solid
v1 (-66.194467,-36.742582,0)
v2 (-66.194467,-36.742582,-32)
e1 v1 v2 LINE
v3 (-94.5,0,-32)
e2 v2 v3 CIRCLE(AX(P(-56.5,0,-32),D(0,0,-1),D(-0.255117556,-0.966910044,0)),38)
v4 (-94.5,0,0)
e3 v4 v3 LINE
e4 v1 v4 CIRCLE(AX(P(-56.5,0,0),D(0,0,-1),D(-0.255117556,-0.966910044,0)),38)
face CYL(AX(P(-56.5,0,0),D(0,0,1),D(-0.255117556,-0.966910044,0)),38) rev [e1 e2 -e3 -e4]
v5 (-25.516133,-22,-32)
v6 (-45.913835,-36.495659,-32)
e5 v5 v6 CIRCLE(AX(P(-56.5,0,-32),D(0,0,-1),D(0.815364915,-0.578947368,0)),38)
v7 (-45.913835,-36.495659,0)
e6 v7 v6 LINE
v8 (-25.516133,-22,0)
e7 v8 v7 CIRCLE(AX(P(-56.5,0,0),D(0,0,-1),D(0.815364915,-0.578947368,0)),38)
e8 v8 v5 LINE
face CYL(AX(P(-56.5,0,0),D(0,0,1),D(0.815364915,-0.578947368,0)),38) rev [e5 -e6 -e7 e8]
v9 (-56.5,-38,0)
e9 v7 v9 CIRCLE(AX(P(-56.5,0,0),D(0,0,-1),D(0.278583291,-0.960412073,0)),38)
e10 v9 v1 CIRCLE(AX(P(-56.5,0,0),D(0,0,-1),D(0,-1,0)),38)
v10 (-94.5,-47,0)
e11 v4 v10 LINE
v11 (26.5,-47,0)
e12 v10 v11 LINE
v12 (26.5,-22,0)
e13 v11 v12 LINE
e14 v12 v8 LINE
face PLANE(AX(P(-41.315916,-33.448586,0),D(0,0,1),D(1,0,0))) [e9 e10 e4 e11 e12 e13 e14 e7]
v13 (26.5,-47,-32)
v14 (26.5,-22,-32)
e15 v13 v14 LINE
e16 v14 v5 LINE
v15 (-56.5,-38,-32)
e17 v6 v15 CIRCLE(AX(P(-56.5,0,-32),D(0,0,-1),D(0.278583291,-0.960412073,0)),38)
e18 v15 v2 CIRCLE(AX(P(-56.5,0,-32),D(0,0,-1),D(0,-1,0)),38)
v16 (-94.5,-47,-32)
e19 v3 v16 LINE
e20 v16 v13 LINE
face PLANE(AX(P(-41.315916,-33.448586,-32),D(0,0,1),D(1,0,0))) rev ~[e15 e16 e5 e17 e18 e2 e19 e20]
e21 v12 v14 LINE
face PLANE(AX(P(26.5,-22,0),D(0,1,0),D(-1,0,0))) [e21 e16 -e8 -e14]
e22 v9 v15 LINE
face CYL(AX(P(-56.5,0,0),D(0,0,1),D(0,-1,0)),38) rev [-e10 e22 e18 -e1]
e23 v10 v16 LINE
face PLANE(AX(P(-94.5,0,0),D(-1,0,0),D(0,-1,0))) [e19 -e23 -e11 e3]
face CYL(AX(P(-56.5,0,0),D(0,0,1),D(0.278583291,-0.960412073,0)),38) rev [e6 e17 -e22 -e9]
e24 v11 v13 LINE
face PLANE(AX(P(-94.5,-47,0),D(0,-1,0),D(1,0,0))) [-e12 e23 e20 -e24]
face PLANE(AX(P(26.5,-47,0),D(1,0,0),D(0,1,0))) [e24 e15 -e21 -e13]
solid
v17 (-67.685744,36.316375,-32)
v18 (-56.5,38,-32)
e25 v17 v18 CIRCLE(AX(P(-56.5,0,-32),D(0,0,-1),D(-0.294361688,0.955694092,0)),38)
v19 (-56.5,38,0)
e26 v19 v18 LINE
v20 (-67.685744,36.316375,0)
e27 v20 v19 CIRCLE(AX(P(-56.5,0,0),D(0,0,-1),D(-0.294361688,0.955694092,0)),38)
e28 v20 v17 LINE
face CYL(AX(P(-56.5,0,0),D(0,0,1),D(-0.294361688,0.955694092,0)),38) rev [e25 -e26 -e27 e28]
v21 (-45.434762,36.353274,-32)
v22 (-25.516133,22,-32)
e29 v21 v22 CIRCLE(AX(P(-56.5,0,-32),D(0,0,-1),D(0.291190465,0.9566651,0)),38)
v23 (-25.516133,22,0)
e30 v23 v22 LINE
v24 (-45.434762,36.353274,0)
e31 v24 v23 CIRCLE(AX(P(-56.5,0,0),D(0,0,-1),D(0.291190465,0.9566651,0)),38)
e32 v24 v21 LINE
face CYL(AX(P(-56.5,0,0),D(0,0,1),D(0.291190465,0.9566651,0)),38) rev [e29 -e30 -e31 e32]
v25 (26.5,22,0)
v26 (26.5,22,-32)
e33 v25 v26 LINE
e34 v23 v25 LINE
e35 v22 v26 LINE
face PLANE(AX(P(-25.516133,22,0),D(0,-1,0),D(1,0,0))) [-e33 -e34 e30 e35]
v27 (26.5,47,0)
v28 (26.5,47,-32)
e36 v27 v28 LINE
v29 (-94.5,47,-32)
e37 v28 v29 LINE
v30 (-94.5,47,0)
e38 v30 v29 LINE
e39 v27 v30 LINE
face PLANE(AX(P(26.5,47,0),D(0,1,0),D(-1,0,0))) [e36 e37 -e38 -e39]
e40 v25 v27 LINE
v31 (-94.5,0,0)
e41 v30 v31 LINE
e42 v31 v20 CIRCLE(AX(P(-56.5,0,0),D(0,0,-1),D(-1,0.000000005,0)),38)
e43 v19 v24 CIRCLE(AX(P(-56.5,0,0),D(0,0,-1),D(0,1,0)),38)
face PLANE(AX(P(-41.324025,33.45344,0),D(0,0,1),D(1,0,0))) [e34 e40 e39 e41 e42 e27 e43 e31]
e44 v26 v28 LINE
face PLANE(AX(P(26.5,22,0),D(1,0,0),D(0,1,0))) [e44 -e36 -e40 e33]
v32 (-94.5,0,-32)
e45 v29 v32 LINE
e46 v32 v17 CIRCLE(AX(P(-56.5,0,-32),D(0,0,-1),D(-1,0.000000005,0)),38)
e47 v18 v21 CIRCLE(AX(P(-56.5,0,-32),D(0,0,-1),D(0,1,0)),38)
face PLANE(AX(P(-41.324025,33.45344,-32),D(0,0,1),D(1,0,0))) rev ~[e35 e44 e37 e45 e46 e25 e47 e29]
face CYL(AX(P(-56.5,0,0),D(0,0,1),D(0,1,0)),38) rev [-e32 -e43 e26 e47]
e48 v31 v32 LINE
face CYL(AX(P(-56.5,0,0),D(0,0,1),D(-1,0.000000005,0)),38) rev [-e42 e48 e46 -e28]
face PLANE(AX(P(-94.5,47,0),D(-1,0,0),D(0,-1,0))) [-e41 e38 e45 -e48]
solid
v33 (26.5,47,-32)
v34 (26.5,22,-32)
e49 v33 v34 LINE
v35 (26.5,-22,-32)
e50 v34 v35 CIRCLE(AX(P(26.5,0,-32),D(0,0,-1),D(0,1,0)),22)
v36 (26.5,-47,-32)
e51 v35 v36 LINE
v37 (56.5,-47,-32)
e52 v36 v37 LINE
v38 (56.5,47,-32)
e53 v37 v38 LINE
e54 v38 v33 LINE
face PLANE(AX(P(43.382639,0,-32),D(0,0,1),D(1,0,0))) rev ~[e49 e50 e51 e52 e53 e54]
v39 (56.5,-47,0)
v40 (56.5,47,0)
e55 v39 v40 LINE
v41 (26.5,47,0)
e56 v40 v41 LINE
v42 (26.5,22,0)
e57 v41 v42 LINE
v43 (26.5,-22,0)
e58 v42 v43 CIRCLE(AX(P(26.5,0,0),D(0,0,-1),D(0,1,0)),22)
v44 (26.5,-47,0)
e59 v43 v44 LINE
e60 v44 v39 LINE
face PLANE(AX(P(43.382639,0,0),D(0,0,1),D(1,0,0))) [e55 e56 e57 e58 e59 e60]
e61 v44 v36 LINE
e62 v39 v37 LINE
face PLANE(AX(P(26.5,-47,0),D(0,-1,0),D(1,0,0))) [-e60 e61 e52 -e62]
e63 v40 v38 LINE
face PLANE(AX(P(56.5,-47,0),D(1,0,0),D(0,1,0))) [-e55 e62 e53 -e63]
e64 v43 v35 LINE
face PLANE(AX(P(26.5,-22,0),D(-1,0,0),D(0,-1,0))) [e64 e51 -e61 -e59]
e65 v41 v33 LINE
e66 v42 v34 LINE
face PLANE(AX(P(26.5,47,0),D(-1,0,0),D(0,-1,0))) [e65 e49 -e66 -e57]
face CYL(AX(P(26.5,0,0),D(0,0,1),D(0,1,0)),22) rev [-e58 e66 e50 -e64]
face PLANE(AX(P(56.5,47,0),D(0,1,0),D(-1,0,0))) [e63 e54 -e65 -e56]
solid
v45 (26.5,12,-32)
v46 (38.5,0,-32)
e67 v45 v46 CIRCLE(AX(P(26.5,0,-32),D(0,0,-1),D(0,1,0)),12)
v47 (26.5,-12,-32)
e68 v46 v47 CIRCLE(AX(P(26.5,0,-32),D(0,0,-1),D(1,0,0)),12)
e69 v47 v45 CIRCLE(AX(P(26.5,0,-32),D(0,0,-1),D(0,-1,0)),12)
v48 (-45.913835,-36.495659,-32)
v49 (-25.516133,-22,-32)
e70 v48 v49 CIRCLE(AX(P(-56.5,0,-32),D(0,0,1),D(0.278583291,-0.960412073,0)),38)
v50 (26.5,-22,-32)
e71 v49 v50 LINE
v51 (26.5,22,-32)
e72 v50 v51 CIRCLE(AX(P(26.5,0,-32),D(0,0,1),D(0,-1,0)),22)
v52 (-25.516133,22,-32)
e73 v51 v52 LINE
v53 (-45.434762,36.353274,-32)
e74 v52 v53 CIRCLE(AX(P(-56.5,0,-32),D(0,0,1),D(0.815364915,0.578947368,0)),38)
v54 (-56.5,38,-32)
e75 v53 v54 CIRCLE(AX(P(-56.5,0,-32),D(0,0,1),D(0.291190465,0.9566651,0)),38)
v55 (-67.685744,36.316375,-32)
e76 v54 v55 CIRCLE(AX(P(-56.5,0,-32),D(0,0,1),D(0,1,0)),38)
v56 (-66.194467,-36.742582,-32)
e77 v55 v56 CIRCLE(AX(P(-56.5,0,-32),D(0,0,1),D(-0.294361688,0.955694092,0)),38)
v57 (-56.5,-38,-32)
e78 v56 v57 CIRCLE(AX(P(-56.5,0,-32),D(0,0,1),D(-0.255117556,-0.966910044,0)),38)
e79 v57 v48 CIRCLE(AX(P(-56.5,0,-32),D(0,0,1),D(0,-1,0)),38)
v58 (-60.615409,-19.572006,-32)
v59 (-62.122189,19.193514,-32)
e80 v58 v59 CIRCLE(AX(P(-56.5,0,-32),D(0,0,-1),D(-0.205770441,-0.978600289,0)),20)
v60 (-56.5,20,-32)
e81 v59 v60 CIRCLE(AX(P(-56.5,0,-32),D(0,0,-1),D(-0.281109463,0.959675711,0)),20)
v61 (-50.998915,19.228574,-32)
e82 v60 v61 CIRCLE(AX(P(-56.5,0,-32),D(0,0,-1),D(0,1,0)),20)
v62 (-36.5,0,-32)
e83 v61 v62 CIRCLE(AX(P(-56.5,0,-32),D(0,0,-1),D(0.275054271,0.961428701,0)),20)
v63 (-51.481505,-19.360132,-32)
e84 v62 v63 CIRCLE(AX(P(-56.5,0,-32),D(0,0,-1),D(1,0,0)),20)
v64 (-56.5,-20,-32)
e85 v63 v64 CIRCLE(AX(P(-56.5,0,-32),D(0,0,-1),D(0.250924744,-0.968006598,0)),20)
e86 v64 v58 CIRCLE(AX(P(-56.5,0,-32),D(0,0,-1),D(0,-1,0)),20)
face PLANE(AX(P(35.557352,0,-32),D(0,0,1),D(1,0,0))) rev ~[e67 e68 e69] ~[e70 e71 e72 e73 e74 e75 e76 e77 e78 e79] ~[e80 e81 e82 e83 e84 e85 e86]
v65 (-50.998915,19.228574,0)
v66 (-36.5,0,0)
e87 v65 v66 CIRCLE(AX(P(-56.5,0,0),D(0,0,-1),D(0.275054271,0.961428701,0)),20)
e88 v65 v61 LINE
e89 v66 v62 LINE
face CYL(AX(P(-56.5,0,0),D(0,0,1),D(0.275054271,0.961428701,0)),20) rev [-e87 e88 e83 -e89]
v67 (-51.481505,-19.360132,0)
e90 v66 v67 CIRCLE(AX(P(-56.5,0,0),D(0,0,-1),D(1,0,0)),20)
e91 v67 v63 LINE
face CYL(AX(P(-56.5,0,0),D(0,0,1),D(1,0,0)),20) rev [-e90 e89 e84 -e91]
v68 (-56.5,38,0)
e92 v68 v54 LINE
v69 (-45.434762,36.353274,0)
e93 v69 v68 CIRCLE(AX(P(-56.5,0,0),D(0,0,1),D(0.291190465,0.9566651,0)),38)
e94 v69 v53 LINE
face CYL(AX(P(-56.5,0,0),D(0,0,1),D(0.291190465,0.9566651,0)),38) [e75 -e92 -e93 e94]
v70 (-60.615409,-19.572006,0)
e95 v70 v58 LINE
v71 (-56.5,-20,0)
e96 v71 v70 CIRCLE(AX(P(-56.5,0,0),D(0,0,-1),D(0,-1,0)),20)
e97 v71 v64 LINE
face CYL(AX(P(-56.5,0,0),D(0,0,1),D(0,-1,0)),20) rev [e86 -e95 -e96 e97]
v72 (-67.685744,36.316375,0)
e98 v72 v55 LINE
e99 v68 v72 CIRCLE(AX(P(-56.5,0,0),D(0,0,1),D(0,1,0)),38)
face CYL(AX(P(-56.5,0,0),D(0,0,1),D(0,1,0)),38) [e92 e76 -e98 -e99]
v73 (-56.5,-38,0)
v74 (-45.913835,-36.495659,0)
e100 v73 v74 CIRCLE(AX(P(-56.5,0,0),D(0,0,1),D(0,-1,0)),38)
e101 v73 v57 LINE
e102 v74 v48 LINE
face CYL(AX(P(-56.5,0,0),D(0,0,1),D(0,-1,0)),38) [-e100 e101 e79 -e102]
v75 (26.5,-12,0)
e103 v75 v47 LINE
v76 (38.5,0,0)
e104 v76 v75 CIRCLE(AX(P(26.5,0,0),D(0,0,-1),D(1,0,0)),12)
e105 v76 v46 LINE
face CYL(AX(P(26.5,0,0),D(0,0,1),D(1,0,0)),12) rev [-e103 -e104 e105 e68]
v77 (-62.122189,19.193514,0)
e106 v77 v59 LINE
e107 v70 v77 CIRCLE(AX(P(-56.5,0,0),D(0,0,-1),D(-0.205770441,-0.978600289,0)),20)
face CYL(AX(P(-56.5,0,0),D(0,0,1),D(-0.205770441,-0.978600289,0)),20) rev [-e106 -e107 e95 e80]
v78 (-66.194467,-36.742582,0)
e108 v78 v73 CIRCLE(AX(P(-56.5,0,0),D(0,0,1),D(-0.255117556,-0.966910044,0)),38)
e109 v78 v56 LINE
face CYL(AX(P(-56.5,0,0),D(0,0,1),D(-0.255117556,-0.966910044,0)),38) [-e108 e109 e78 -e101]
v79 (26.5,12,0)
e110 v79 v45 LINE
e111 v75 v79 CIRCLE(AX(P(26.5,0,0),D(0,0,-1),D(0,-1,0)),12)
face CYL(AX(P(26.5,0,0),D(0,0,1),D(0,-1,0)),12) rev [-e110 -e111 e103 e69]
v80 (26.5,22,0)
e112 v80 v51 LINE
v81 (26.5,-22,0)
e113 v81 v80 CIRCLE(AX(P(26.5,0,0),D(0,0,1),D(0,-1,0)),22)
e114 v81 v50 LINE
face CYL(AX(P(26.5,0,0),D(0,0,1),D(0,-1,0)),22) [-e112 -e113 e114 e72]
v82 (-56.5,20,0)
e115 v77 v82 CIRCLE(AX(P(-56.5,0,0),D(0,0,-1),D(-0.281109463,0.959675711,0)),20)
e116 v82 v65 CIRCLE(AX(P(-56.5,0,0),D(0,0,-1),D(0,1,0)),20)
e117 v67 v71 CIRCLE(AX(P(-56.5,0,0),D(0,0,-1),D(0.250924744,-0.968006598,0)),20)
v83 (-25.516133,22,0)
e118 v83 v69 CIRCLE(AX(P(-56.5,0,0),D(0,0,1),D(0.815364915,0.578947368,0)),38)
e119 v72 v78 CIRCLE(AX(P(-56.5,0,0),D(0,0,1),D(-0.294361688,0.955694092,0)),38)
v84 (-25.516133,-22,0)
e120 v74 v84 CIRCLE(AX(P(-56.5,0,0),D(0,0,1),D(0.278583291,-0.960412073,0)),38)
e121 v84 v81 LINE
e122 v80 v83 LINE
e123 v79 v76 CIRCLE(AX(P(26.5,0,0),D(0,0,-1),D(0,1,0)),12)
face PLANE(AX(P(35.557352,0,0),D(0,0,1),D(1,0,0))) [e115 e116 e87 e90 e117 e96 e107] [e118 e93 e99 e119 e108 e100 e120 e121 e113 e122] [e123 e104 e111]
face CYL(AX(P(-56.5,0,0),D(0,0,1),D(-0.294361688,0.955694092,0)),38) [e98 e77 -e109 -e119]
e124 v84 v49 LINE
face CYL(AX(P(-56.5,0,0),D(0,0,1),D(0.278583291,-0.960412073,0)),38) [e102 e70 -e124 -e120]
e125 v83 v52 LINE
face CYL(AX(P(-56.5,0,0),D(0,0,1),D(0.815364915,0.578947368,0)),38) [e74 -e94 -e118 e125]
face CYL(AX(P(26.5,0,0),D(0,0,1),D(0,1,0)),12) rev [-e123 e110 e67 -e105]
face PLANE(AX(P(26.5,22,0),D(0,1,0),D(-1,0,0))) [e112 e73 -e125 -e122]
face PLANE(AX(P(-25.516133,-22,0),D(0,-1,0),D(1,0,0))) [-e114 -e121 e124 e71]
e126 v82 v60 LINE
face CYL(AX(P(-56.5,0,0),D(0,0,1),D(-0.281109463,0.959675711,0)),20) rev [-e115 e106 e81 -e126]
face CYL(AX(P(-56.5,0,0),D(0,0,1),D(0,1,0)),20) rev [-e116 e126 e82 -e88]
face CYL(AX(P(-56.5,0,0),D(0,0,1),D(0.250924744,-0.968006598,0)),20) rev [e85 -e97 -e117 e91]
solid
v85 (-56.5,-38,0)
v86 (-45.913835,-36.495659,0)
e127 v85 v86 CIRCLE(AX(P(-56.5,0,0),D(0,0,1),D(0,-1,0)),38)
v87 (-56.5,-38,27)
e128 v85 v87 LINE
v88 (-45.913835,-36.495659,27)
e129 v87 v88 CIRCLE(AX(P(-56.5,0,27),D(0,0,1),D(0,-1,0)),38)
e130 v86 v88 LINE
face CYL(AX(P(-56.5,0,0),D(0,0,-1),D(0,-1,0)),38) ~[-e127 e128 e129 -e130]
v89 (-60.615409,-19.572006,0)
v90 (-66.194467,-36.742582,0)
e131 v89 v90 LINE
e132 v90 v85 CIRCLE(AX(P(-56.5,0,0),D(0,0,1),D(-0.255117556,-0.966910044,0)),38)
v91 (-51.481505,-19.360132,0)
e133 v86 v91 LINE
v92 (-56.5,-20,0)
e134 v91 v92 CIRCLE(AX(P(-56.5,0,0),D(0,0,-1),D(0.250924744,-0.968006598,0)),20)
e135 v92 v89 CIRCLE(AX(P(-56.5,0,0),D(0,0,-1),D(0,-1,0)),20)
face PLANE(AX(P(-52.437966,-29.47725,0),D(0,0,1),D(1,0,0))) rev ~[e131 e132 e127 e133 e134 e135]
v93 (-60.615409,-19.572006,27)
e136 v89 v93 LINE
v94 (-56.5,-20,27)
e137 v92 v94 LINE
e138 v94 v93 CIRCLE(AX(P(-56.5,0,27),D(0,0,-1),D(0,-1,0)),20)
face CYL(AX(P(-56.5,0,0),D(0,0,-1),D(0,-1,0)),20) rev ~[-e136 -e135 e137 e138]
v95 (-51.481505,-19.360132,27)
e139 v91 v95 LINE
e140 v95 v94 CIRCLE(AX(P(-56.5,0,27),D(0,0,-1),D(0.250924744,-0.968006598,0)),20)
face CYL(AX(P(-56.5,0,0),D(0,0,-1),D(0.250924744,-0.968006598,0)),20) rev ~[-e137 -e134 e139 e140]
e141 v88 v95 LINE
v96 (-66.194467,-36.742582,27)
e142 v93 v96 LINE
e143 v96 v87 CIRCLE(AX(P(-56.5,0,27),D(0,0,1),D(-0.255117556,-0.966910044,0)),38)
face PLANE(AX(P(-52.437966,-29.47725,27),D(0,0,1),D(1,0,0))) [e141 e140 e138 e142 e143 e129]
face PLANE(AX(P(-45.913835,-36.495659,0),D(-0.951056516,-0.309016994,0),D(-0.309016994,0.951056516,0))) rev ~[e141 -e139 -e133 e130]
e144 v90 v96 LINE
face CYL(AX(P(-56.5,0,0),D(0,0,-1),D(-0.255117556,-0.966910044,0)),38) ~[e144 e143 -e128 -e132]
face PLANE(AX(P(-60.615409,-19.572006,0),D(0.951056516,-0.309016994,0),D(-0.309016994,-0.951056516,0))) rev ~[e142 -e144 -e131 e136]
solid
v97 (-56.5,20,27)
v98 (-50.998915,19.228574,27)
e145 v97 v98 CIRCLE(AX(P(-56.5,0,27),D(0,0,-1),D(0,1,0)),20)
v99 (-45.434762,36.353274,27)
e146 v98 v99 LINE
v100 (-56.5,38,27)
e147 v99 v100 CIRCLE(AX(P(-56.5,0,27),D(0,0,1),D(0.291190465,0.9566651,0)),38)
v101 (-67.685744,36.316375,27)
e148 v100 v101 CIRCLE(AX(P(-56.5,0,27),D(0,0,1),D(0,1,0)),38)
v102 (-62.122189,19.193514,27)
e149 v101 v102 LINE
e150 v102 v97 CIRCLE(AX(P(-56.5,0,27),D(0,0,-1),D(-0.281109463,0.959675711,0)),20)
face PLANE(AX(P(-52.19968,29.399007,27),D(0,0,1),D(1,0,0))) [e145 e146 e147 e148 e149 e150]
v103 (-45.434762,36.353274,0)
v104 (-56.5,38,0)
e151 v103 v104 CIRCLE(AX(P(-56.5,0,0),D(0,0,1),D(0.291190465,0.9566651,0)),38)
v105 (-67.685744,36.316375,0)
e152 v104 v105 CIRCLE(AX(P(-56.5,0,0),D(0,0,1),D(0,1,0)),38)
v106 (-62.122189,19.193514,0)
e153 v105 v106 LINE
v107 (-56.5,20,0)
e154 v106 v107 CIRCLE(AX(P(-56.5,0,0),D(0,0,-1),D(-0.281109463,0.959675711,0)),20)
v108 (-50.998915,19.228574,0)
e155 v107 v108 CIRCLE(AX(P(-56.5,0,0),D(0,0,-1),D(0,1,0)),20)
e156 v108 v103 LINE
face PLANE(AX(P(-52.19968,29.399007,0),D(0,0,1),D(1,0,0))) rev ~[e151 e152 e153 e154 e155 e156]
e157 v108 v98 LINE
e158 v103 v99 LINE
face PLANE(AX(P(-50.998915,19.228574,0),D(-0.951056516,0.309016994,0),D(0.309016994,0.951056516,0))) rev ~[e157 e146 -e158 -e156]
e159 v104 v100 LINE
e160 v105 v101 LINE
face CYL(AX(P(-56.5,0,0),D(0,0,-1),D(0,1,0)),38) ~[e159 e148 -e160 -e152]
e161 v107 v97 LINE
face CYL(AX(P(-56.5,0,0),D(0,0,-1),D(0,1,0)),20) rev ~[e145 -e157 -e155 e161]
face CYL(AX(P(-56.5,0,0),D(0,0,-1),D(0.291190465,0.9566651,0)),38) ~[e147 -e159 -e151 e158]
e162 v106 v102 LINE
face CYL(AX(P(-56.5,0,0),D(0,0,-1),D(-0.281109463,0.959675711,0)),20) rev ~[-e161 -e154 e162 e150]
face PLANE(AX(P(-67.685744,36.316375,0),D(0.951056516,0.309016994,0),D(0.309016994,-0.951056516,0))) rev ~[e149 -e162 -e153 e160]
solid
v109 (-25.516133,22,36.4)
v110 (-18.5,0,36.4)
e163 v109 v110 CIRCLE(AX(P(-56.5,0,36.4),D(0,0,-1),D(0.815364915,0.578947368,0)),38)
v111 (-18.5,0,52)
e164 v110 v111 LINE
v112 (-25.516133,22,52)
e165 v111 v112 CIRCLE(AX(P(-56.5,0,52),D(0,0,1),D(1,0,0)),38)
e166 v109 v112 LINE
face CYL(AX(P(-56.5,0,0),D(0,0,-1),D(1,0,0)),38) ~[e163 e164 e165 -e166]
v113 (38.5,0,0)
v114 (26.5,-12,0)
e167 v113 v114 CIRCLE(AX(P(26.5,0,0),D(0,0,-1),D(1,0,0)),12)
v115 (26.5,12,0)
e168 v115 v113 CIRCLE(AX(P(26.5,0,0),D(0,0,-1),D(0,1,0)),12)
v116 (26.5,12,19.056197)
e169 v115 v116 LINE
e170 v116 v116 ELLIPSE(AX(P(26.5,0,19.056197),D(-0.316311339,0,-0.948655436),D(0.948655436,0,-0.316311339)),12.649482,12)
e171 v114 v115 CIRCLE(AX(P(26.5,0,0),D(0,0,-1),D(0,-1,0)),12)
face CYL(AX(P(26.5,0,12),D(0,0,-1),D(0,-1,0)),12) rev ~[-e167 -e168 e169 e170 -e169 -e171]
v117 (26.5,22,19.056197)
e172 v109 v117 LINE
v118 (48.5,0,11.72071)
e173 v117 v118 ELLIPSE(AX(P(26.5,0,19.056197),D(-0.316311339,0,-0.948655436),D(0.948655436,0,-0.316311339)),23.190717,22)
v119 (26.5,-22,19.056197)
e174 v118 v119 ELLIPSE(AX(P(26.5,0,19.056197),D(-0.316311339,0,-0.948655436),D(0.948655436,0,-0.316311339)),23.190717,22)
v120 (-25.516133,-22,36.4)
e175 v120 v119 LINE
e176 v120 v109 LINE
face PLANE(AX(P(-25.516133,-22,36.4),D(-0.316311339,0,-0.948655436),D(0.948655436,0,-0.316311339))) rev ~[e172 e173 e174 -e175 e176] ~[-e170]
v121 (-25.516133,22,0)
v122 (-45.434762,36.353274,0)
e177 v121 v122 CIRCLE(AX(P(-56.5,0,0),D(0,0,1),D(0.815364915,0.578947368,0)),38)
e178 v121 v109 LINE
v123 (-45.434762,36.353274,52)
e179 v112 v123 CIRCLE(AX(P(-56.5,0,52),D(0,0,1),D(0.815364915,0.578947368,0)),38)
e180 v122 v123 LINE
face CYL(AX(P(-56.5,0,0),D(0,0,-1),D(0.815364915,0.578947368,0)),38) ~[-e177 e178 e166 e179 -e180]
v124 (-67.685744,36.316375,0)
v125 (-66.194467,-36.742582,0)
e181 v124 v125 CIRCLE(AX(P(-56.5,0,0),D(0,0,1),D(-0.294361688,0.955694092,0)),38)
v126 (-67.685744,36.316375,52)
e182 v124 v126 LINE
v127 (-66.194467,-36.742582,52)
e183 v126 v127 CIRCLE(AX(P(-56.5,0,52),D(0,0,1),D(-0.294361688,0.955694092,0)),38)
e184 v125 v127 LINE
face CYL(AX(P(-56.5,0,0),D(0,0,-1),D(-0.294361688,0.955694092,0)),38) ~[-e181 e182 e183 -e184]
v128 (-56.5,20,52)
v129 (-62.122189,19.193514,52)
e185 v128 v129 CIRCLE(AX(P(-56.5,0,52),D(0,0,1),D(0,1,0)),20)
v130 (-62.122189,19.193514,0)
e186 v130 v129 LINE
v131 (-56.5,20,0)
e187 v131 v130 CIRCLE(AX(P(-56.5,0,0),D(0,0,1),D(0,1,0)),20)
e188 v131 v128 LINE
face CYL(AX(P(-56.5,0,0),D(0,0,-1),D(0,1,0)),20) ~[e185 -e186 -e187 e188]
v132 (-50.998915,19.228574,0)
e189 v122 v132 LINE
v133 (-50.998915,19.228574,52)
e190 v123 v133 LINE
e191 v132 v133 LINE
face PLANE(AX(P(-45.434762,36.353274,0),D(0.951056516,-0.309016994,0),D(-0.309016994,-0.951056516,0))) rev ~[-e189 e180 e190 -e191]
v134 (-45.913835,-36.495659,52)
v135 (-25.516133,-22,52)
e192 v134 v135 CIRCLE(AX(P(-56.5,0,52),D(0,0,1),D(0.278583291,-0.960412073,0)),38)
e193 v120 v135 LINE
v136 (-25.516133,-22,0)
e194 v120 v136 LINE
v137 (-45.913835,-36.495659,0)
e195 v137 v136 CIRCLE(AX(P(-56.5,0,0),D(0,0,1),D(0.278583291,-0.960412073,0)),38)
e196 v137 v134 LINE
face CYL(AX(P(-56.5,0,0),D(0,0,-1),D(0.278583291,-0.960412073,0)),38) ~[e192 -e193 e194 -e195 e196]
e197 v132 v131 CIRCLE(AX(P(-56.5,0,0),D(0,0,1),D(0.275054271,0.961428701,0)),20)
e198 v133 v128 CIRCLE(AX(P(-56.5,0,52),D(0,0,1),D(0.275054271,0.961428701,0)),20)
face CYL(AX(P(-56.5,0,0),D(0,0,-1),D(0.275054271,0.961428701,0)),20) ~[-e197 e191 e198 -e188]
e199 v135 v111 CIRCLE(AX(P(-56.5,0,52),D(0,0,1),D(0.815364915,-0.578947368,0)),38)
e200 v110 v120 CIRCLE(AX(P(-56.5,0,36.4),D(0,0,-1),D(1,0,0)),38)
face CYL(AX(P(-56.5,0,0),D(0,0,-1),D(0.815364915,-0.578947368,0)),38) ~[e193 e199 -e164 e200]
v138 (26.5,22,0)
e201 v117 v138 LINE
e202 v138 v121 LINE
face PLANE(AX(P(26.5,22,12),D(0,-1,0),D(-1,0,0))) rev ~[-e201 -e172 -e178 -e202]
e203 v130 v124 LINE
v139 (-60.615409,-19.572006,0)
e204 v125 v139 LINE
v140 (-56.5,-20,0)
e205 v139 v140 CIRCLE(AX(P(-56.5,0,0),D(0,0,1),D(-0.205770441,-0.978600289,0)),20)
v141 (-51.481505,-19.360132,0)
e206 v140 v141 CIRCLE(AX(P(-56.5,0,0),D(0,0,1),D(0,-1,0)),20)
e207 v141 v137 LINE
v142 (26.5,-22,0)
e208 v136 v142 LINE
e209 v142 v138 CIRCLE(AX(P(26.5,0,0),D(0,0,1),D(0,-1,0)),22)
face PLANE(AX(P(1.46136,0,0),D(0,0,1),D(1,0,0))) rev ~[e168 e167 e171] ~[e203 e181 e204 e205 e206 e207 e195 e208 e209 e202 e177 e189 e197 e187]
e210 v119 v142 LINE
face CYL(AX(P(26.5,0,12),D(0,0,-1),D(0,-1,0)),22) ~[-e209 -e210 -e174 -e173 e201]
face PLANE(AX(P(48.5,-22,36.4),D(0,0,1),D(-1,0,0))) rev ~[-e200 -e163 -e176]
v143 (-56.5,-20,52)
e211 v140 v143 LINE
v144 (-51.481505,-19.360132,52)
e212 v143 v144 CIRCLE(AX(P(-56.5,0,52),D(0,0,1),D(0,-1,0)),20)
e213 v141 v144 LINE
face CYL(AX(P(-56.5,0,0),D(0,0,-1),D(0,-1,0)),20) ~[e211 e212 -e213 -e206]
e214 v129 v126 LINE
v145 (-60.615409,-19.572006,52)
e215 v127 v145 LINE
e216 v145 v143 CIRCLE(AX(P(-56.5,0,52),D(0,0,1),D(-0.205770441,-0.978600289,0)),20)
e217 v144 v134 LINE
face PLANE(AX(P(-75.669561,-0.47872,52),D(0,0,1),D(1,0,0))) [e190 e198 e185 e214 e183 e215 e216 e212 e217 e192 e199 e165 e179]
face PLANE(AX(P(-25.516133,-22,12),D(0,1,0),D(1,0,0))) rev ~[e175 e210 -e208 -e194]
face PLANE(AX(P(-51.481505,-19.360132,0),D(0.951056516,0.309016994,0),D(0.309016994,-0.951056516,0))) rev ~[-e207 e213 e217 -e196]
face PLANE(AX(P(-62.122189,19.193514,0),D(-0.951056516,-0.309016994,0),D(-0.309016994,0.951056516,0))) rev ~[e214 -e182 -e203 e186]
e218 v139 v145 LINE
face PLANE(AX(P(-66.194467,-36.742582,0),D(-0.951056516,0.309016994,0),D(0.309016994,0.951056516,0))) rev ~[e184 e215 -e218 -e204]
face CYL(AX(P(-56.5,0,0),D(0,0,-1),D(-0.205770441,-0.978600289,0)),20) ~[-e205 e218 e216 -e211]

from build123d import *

# Parameters (mm, degrees)
F1_DEPTH = 52
F2_DEPTH = 27
F3_DEPTH = 32
F4_DEPTH = 32
F5_DEPTH = 12
F6_DEPTH = 24.4
F8_DEPTH = 74.5
F9_DEPTH = 32


with BuildPart() as f1:
    # F0 (on Top) → F1 (new body)
    with BuildSketch(Plane.XY):
        with BuildLine():
            ThreePointArc((-67.6857441339, 36.3163754823), (-87.0700692693, 22.5714612924), (-94.5, 1.882e-07))
            ThreePointArc((-94.5, 1.882e-07), (-86.6030709179, -23.1906257205), (-66.1944671175, -36.7425816636))
            Line((-66.1944671175, -36.7425816636), (-60.6154088174, -19.5720057803))
            ThreePointArc((-60.6154088174, -19.5720057803), (-76.4849090369, -0.7767952022), (-62.122189253, 19.1935142171))
            Line((-62.122189253, 19.1935142171), (-67.6857441339, 36.3163754823))
        make_face()
        with BuildLine():
            ThreePointArc((-18.5, 0), (-20.2964992214, 11.5458447667), (-25.5161332303, 22))
            ThreePointArc((-25.5161332303, 22), (-34.2843318109, 30.8295975795), (-45.4347623345, 36.3532737921))
            Line((-45.4347623345, 36.3532737921), (-50.9989145795, 19.2285740292))
            ThreePointArc((-50.9989145795, 19.2285740292), (-40.5309407226, 12.041143874), (-36.5, 0))
            ThreePointArc((-36.5, 0), (-40.6827641878, -12.2398958845), (-51.4815051263, -19.3601319521))
            Line((-51.4815051263, -19.3601319521), (-45.9138349552, -36.4956587781))
            ThreePointArc((-45.9138349552, -36.4956587781), (-34.4875508606, -30.9750235332), (-25.5161332303, -22))
            ThreePointArc((-25.5161332303, -22), (-20.2964992214, -11.5458447667), (-18.5, 0))
        make_face()
        with BuildLine():
            ThreePointArc((-36.5, 0), (-40.5309407226, 12.041143874), (-50.9989145795, 19.2285740292))
            ThreePointArc((-50.9989145795, 19.2285740292), (-53.7225443824, 19.8062045908), (-56.5, 20))
            Line((-56.5, 20), (-56.5, 0))
            Line((-56.5, 0), (-56.5, -20))
            ThreePointArc((-56.5, -20), (-53.9704386785, -19.8393880833), (-51.4815051263, -19.3601319521))
            ThreePointArc((-51.4815051263, -19.3601319521), (-40.6827641878, -12.2398958845), (-36.5, 0))
        make_face()
        with BuildLine():
            ThreePointArc((-56.5, 20), (-59.339869333, 19.797351898), (-62.122189253, 19.1935142171))
            ThreePointArc((-62.122189253, 19.1935142171), (-76.4849090369, -0.7767952022), (-60.6154088174, -19.5720057803))
            ThreePointArc((-60.6154088174, -19.5720057803), (-58.5688021163, -19.8927136863), (-56.5, -20))
            Line((-56.5, -20), (-56.5, 0))
            Line((-56.5, 0), (-56.5, 20))
        make_face()
    extrude(amount=F1_DEPTH)

    # F0 (on Top) → F5 (join)
    with BuildSketch(Plane.XY):
        with BuildLine():
            Line((26.5, 12), (26.5, 22))
            Line((26.5, 22), (-25.5161332303, 22))
            ThreePointArc((-25.5161332303, 22), (-20.2964992214, 11.5458447667), (-18.5, 0))
            ThreePointArc((-18.5, 0), (-20.2964992214, -11.5458447667), (-25.5161332303, -22))
            Line((-25.5161332303, -22), (26.5, -22))
            Line((26.5, -22), (26.5, -12))
            ThreePointArc((26.5, -12), (14.5, 0), (26.5, 12))
        make_face()
        with BuildLine():
            ThreePointArc((26.5, -22), (48.5, 0), (26.5, 22))
            Line((26.5, 22), (26.5, 12))
            ThreePointArc((26.5, 12), (34.9852813742, 8.4852813742), (38.5, 0))
            ThreePointArc((38.5, 0), (34.9852813742, -8.4852813742), (26.5, -12))
            Line((26.5, -12), (26.5, -22))
        make_face()
    extrude(amount=F5_DEPTH)

    # F6 (add): a face of the model
    f6_faces = [f1.faces().sort_by_distance(p)[0] for p in [
        (8.8600631876, 0, 12),
    ]]
    extrude(f6_faces, amount=F6_DEPTH)

    # F7 (on face) → F8 (cut)
    with BuildSketch(Plane.XZ.offset(22)):
        Polygon((26.5, 19.0561972631), (26.5, 36.4), (-25.5161332303, 36.4), align=None)
        Polygon((48.5, 11.720710434), (48.5, 36.4), (26.5, 36.4), (26.5, 19.0561972631), align=None)
    extrude(amount=-F8_DEPTH, mode=Mode.SUBTRACT)


with BuildPart() as f2:
    # F0 (on Top) → F2 (new body)
    with BuildSketch(Plane.XY):
        with BuildLine():
            Line((-56.5, -20), (-56.5, -38))
            ThreePointArc((-56.5, -38), (-51.1537411943, -37.6220349899), (-45.9138349552, -36.4956587781))
            Line((-45.9138349552, -36.4956587781), (-51.4815051263, -19.3601319521))
            ThreePointArc((-51.4815051263, -19.3601319521), (-53.9704386785, -19.8393880833), (-56.5, -20))
        make_face()
        with BuildLine():
            Line((-60.6154088174, -19.5720057803), (-66.1944671175, -36.7425816636))
            ThreePointArc((-66.1944671175, -36.7425816636), (-61.3878367804, -37.6843342997), (-56.5, -38))
            Line((-56.5, -38), (-56.5, -20))
            ThreePointArc((-56.5, -20), (-58.5688021163, -19.8927136863), (-60.6154088174, -19.5720057803))
        make_face()
    extrude(amount=F2_DEPTH)


with BuildPart() as f2b:
    # F0 (on Top) → F2, piece 2 (new body)
    with BuildSketch(Plane.XY):
        with BuildLine():
            Line((-50.9989145795, 19.2285740292), (-45.4347623345, 36.3532737921))
            ThreePointArc((-45.4347623345, 36.3532737921), (-50.9064503265, 37.586063934), (-56.5, 38))
            Line((-56.5, 38), (-56.5, 20))
            ThreePointArc((-56.5, 20), (-53.7225443824, 19.8062045908), (-50.9989145795, 19.2285740292))
        make_face()
        with BuildLine():
            ThreePointArc((-56.5, 38), (-62.1558700336, 37.5767366088), (-67.6857441339, 36.3163754823))
            Line((-67.6857441339, 36.3163754823), (-62.122189253, 19.1935142171))
            ThreePointArc((-62.122189253, 19.1935142171), (-59.339869333, 19.797351898), (-56.5, 20))
            Line((-56.5, 20), (-56.5, 38))
        make_face()
    extrude(amount=F2_DEPTH)


with BuildPart() as f3:
    # F0 (on Top) → F3 (new body)
    with BuildSketch(Plane.XY):
        with BuildLine():
            Line((26.5, 47), (-56.5, 47))
            Line((-56.5, 47), (-94.5, 47))
            Line((-94.5, 47), (-94.5, 1.882e-07))
            ThreePointArc((-94.5, 1.882e-07), (-87.0700692693, 22.5714612924), (-67.6857441339, 36.3163754823))
            ThreePointArc((-67.6857441339, 36.3163754823), (-62.1558700336, 37.5767366088), (-56.5, 38))
            ThreePointArc((-56.5, 38), (-50.9064503265, 37.586063934), (-45.4347623345, 36.3532737921))
            ThreePointArc((-45.4347623345, 36.3532737921), (-34.2843318109, 30.8295975795), (-25.5161332303, 22))
            Line((-25.5161332303, 22), (26.5, 22))
            Line((26.5, 22), (26.5, 47))
        make_face()
    extrude(amount=-F3_DEPTH)


with BuildPart() as f3b:
    # F0 (on Top) → F3, piece 2 (new body)
    with BuildSketch(Plane.XY):
        with BuildLine():
            ThreePointArc((-66.1944671175, -36.7425816636), (-86.6030709179, -23.1906257205), (-94.5, 1.882e-07))
            Line((-94.5, 1.882e-07), (-94.5, -47))
            Line((-94.5, -47), (-56.5, -47))
            Line((-56.5, -47), (26.5, -47))
            Line((26.5, -47), (26.5, -22))
            Line((26.5, -22), (-25.5161332303, -22))
            ThreePointArc((-25.5161332303, -22), (-34.4875508606, -30.9750235332), (-45.9138349552, -36.4956587781))
            ThreePointArc((-45.9138349552, -36.4956587781), (-51.1537411943, -37.6220349899), (-56.5, -38))
            ThreePointArc((-56.5, -38), (-61.3878367804, -37.6843342997), (-66.1944671175, -36.7425816636))
        make_face()
    extrude(amount=-F3_DEPTH)


with BuildPart() as f4:
    # F0 (on Top) → F4 (new body)
    with BuildSketch(Plane.XY):
        with BuildLine():
            Line((56.5, 47), (26.5, 47))
            Line((26.5, 47), (26.5, 22))
            ThreePointArc((26.5, 22), (48.5, 0), (26.5, -22))
            Line((26.5, -22), (26.5, -47))
            Line((26.5, -47), (56.5, -47))
            Line((56.5, -47), (56.5, 47))
        make_face()
    extrude(amount=-F4_DEPTH)


with BuildPart() as f9:
    # F0 (on Top) → F9 (new body)
    with BuildSketch(Plane.XY):
        with BuildLine():
            ThreePointArc((26.5, -22), (48.5, 0), (26.5, 22))
            Line((26.5, 22), (26.5, 12))
            ThreePointArc((26.5, 12), (34.9852813742, 8.4852813742), (38.5, 0))
            ThreePointArc((38.5, 0), (34.9852813742, -8.4852813742), (26.5, -12))
            Line((26.5, -12), (26.5, -22))
        make_face()
        with BuildLine():
            Line((26.5, 12), (26.5, 22))
            Line((26.5, 22), (-25.5161332303, 22))
            ThreePointArc((-25.5161332303, 22), (-20.2964992214, 11.5458447667), (-18.5, 0))
            ThreePointArc((-18.5, 0), (-20.2964992214, -11.5458447667), (-25.5161332303, -22))
            Line((-25.5161332303, -22), (26.5, -22))
            Line((26.5, -22), (26.5, -12))
            ThreePointArc((26.5, -12), (14.5, 0), (26.5, 12))
        make_face()
        with BuildLine():
            ThreePointArc((-18.5, 0), (-20.2964992214, 11.5458447667), (-25.5161332303, 22))
            ThreePointArc((-25.5161332303, 22), (-34.2843318109, 30.8295975795), (-45.4347623345, 36.3532737921))
            Line((-45.4347623345, 36.3532737921), (-50.9989145795, 19.2285740292))
            ThreePointArc((-50.9989145795, 19.2285740292), (-40.5309407226, 12.041143874), (-36.5, 0))
            ThreePointArc((-36.5, 0), (-40.6827641878, -12.2398958845), (-51.4815051263, -19.3601319521))
            Line((-51.4815051263, -19.3601319521), (-45.9138349552, -36.4956587781))
            ThreePointArc((-45.9138349552, -36.4956587781), (-34.4875508606, -30.9750235332), (-25.5161332303, -22))
            ThreePointArc((-25.5161332303, -22), (-20.2964992214, -11.5458447667), (-18.5, 0))
        make_face()
        with BuildLine():
            Line((-50.9989145795, 19.2285740292), (-45.4347623345, 36.3532737921))
            ThreePointArc((-45.4347623345, 36.3532737921), (-50.9064503265, 37.586063934), (-56.5, 38))
            Line((-56.5, 38), (-56.5, 20))
            ThreePointArc((-56.5, 20), (-53.7225443824, 19.8062045908), (-50.9989145795, 19.2285740292))
        make_face()
        with BuildLine():
            ThreePointArc((-56.5, 38), (-62.1558700336, 37.5767366088), (-67.6857441339, 36.3163754823))
            Line((-67.6857441339, 36.3163754823), (-62.122189253, 19.1935142171))
            ThreePointArc((-62.122189253, 19.1935142171), (-59.339869333, 19.797351898), (-56.5, 20))
            Line((-56.5, 20), (-56.5, 38))
        make_face()
        with BuildLine():
            ThreePointArc((-67.6857441339, 36.3163754823), (-87.0700692693, 22.5714612924), (-94.5, 1.882e-07))
            ThreePointArc((-94.5, 1.882e-07), (-86.6030709179, -23.1906257205), (-66.1944671175, -36.7425816636))
            Line((-66.1944671175, -36.7425816636), (-60.6154088174, -19.5720057803))
            ThreePointArc((-60.6154088174, -19.5720057803), (-76.4849090369, -0.7767952022), (-62.122189253, 19.1935142171))
            Line((-62.122189253, 19.1935142171), (-67.6857441339, 36.3163754823))
        make_face()
        with BuildLine():
            Line((-56.5, -20), (-56.5, -38))
            ThreePointArc((-56.5, -38), (-51.1537411943, -37.6220349899), (-45.9138349552, -36.4956587781))
            Line((-45.9138349552, -36.4956587781), (-51.4815051263, -19.3601319521))
            ThreePointArc((-51.4815051263, -19.3601319521), (-53.9704386785, -19.8393880833), (-56.5, -20))
        make_face()
        with BuildLine():
            Line((-60.6154088174, -19.5720057803), (-66.1944671175, -36.7425816636))
            ThreePointArc((-66.1944671175, -36.7425816636), (-61.3878367804, -37.6843342997), (-56.5, -38))
            Line((-56.5, -38), (-56.5, -20))
            ThreePointArc((-56.5, -20), (-58.5688021163, -19.8927136863), (-60.6154088174, -19.5720057803))
        make_face()
    extrude(amount=-F9_DEPTH)


solid = Compound([f1.part, f2.part, f2b.part, f3.part, f3b.part, f4.part, f9.part])
